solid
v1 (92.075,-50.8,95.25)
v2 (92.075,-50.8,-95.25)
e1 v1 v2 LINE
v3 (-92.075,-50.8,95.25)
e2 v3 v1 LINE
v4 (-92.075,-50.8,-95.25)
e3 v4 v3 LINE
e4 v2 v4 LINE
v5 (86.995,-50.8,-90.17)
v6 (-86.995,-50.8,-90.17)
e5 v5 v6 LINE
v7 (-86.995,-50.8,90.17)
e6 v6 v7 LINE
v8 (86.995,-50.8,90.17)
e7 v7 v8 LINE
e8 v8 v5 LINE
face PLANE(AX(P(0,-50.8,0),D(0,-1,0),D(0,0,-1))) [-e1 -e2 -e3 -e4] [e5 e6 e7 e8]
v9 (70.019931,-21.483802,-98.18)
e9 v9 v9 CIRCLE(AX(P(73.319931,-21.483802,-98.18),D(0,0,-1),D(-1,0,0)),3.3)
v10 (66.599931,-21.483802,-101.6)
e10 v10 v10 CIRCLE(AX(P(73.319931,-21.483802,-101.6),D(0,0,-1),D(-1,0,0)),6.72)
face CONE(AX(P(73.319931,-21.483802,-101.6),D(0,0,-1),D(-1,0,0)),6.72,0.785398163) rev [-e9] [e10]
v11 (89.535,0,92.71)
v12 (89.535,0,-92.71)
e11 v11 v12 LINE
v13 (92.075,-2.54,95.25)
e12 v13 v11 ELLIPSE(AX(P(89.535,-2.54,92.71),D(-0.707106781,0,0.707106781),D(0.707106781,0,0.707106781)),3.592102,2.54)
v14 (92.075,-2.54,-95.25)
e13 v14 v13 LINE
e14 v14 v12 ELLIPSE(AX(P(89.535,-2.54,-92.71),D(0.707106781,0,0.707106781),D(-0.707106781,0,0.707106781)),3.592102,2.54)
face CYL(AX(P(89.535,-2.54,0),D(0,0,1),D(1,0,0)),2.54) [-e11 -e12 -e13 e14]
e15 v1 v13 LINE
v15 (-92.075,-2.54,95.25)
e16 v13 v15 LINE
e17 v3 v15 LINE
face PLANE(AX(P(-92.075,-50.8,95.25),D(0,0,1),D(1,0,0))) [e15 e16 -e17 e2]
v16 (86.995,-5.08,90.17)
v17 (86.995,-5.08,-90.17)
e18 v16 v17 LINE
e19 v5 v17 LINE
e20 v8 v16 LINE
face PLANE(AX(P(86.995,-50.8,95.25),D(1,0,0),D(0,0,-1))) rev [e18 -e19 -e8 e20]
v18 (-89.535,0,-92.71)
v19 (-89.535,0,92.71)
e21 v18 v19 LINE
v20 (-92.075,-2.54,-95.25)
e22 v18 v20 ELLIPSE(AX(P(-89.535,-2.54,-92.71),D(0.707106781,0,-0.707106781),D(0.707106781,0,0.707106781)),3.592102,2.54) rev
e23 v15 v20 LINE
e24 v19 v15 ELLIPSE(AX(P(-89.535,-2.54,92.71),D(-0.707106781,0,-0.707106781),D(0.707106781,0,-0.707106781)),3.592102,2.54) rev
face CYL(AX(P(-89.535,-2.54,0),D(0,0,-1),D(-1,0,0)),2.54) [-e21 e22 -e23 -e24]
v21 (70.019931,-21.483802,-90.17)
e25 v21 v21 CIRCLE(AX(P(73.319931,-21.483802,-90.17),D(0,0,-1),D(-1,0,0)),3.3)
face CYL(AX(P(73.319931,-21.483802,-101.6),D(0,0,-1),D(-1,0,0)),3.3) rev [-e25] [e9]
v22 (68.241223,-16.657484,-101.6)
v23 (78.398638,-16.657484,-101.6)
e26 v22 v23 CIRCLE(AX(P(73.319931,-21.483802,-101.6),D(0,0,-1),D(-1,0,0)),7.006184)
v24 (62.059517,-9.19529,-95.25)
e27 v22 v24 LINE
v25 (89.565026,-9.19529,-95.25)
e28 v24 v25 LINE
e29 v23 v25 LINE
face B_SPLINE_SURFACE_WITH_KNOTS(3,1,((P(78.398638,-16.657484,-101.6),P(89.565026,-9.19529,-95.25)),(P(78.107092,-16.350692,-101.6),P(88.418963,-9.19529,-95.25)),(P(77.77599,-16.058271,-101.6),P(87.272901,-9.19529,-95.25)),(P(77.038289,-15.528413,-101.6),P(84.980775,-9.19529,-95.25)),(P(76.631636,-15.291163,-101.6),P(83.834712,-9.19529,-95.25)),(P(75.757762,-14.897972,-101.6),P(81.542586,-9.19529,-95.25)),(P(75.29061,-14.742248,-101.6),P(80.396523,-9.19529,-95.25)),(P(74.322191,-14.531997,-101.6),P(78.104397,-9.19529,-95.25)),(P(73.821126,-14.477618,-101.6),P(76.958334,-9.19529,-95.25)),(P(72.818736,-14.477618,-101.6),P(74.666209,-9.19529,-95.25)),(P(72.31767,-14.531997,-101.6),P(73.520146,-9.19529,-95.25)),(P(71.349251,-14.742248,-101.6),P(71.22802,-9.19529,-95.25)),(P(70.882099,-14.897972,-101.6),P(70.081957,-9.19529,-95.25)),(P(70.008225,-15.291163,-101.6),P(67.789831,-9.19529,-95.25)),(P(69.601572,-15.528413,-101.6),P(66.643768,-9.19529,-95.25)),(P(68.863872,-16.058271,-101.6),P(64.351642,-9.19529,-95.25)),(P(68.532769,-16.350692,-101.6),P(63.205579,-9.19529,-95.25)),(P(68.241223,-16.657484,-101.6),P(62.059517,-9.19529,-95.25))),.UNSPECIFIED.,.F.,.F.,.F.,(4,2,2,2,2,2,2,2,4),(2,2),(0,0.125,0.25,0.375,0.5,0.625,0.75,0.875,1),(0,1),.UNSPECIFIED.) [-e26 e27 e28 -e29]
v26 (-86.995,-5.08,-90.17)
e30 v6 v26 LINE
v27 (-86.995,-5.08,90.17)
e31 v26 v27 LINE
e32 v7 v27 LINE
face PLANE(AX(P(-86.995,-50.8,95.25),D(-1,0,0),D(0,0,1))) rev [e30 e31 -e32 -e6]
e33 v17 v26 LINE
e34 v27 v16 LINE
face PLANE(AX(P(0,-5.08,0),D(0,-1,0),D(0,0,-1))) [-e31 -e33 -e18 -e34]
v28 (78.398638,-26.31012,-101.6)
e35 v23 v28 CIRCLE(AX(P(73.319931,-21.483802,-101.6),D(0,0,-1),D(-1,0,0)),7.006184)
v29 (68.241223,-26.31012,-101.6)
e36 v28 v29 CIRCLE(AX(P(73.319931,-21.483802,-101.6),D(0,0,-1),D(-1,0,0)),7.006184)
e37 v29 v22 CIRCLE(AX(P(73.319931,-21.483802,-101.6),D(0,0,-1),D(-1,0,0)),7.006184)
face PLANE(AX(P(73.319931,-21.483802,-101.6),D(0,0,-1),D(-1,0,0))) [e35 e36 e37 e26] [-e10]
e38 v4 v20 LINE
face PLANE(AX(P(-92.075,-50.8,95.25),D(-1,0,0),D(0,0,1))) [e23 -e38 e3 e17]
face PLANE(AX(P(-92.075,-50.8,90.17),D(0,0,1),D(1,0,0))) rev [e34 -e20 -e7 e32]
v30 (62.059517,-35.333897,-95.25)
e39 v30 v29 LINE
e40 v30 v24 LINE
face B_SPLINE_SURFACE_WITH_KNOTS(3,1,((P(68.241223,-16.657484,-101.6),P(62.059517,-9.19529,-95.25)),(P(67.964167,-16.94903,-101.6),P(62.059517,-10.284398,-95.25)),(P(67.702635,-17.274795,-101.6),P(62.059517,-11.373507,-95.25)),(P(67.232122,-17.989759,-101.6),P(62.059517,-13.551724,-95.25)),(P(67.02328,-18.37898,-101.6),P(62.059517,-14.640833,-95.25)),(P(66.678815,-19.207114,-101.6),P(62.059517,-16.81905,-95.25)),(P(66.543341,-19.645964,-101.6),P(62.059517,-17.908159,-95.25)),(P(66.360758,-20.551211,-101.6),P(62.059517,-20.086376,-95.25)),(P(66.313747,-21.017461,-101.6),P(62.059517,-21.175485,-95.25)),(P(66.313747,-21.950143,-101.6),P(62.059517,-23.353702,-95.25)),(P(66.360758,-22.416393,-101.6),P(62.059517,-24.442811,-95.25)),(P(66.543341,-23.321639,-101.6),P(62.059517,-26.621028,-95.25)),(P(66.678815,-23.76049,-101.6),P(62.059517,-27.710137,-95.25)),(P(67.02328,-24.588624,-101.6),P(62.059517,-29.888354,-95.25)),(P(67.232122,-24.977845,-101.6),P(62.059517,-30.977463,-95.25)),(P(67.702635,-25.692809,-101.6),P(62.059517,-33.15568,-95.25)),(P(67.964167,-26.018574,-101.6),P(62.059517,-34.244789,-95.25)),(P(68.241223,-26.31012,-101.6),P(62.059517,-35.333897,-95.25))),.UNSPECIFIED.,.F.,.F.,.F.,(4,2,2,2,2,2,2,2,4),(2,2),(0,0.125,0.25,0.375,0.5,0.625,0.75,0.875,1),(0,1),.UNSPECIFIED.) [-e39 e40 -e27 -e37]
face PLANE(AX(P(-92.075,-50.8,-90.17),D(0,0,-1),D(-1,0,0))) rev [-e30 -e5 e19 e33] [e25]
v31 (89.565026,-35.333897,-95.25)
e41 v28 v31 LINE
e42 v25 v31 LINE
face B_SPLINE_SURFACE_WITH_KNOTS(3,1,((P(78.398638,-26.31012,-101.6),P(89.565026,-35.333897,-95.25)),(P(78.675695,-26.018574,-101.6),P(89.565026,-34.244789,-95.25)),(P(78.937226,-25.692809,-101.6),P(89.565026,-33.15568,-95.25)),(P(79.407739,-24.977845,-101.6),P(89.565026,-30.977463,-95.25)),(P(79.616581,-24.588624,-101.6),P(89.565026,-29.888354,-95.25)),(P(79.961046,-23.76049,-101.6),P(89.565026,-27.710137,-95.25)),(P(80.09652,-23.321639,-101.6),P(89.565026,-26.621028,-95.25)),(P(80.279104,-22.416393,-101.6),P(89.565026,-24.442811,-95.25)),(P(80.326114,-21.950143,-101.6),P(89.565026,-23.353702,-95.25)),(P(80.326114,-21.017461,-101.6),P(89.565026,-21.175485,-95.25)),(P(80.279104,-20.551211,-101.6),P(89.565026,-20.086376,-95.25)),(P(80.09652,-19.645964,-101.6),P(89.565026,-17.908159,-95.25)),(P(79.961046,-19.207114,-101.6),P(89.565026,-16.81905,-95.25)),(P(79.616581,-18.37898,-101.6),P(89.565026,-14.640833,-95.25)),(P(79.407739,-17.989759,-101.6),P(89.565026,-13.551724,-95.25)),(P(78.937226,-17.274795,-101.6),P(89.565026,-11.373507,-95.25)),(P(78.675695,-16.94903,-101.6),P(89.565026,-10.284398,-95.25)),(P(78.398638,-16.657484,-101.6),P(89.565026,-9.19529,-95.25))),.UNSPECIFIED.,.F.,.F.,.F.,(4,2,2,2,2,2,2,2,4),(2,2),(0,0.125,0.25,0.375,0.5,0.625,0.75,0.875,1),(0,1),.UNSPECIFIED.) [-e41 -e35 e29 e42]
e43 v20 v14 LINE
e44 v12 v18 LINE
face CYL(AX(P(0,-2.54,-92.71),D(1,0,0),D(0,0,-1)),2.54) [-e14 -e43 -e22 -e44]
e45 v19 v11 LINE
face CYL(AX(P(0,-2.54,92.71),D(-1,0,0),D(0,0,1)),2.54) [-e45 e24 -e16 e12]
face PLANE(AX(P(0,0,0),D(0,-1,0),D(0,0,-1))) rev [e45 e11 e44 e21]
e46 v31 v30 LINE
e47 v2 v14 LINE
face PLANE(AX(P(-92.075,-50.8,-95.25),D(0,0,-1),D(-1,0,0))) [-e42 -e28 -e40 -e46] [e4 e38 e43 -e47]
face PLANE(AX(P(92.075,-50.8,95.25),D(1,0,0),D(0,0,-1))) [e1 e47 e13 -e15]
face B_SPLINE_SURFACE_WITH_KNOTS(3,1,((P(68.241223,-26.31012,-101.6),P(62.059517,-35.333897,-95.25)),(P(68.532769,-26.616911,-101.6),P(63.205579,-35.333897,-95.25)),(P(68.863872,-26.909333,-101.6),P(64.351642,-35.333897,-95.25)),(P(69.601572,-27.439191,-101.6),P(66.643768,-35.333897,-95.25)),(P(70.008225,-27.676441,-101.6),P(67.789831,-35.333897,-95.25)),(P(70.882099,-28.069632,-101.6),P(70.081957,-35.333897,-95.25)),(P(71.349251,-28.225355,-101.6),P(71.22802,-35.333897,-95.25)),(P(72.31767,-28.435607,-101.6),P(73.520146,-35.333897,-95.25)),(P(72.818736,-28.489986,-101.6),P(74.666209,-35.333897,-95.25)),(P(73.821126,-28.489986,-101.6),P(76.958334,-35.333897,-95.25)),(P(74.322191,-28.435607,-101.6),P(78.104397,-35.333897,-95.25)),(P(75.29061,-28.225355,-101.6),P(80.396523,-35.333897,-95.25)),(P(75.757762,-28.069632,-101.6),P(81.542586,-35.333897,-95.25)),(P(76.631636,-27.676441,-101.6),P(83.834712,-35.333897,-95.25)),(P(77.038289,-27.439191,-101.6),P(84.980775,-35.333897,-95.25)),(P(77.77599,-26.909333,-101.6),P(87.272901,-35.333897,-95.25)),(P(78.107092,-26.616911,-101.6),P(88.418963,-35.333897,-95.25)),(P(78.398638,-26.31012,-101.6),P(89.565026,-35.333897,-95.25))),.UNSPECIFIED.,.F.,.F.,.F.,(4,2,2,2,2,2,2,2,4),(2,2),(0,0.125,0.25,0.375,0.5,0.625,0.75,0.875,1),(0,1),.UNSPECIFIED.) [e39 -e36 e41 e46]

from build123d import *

# Parameters (mm, degrees)
SKETCH2_W                                            = 184.15
SKETCH2_H                                            = 190.5
BOSS_EXTRUDE1_DEPTH                                  = 50.8
SHELL1_T                                             = -5.08
CSK_FOR_M6_HEX_SOCKET_COUNTERSUNK_CAP_SC_D           = 6.6
CSK_FOR_M6_HEX_SOCKET_COUNTERSUNK_CAP_SC_DEPTH       = 11.733159957
CSK_FOR_M6_HEX_SOCKET_COUNTERSUNK_CAP_SC_CSINK_D     = 13.44
CSK_FOR_M6_HEX_SOCKET_COUNTERSUNK_CAP_SC_CSINK_ANGLE = 90
CSK_FOR_M6_HEX_SOCKET_COUNTERSUNK_CAP_SC_TIP         = 1.982840043
FILLET1_R                                            = 2.54


with BuildPart() as part:
    # Sketch2 → Boss-Extrude1 (new body)
    with BuildSketch(Plane(origin=(0, 0, 0), x_dir=(1, 0, 0), z_dir=(0, 1, 0))):
        Rectangle(SKETCH2_W, SKETCH2_H)
    extrude(amount=-BOSS_EXTRUDE1_DEPTH)

    # Shell1
    shell1_openings = [part.faces().sort_by_distance(p)[0] for p in [
        (0, -50.8, 0),
    ]]
    offset(amount=SHELL1_T, openings=shell1_openings, kind=Kind.INTERSECTION)

    # Loft1: read off the stored shape, not the designer's step
    # Loft1: loft between two sections, ruled curve by curve
    loft1_from = [
        Edge.make_bspline([(68.241223487, -26.310119776, -101.6), (68.532768976, -26.616911457, -101.6), (68.863871753, -26.909333008, -101.6), (69.601572379, -27.439191099, -101.6), (70.008225028, -27.676441112, -101.6), (70.882099248, -28.069631586, -101.6), (71.349251098, -28.225355381, -101.6), (72.31767022, -28.435607084, -101.6), (72.818735502, -28.489985667, -101.6), (73.821125836, -28.489985667, -101.6), (74.322191118, -28.435607084, -101.6), (75.29061024, -28.225355381, -101.6), (75.757762089, -28.069631586, -101.6), (76.631636309, -27.676441112, -101.6), (77.038288959, -27.439191099, -101.6), (77.775989584, -26.909333008, -101.6), (78.107092362, -26.616911457, -101.6), (78.39863785, -26.310119776, -101.6)], [0, 0, 0, 0, 0.125, 0.125, 0.25, 0.25, 0.375, 0.375, 0.5, 0.5, 0.625, 0.625, 0.75, 0.75, 0.875, 0.875, 1, 1, 1, 1], 3),
        Edge.make_bspline([(78.39863785, -26.310119776, -101.6), (78.675694815, -26.018574288, -101.6), (78.937226358, -25.692808769, -101.6), (79.407739121, -24.977845102, -101.6), (79.616581189, -24.588623733, -101.6), (79.961046476, -23.760489668, -101.6), (80.096520237, -23.321639377, -101.6), (80.279103538, -22.416392759, -101.6), (80.326114413, -21.950142771, -101.6), (80.326114413, -21.017461075, -101.6), (80.279103538, -20.551211086, -101.6), (80.096520237, -19.645964468, -101.6), (79.961046476, -19.207114178, -101.6), (79.616581189, -18.378980112, -101.6), (79.407739121, -17.989758743, -101.6), (78.937226358, -17.274795077, -101.6), (78.675694815, -16.949029558, -101.6), (78.39863785, -16.657484069, -101.6)], [0, 0, 0, 0, 0.125, 0.125, 0.25, 0.25, 0.375, 0.375, 0.5, 0.5, 0.625, 0.625, 0.75, 0.75, 0.875, 0.875, 1, 1, 1, 1], 3),
        Edge.make_bspline([(68.241223487, -16.657484069, -101.6), (67.964166523, -16.949029558, -101.6), (67.70263498, -17.274795077, -101.6), (67.232122217, -17.989758743, -101.6), (67.023280149, -18.378980112, -101.6), (66.678814862, -19.207114178, -101.6), (66.543341101, -19.645964468, -101.6), (66.3607578, -20.551211086, -101.6), (66.313746925, -21.017461075, -101.6), (66.313746925, -21.950142771, -101.6), (66.3607578, -22.416392759, -101.6), (66.543341101, -23.321639377, -101.6), (66.678814862, -23.760489668, -101.6), (67.023280149, -24.588623733, -101.6), (67.232122217, -24.977845102, -101.6), (67.70263498, -25.692808769, -101.6), (67.964166523, -26.018574288, -101.6), (68.241223487, -26.310119776, -101.6)], [0, 0, 0, 0, 0.125, 0.125, 0.25, 0.25, 0.375, 0.375, 0.5, 0.5, 0.625, 0.625, 0.75, 0.75, 0.875, 0.875, 1, 1, 1, 1], 3),
        Edge.make_bspline([(78.39863785, -16.657484069, -101.6), (78.107092362, -16.350692388, -101.6), (77.775989584, -16.058270838, -101.6), (77.038288959, -15.528412746, -101.6), (76.631636309, -15.291162733, -101.6), (75.757762089, -14.89797226, -101.6), (75.29061024, -14.742248464, -101.6), (74.322191118, -14.531996762, -101.6), (73.821125836, -14.477618178, -101.6), (72.818735502, -14.477618178, -101.6), (72.31767022, -14.531996762, -101.6), (71.349251098, -14.742248464, -101.6), (70.882099248, -14.89797226, -101.6), (70.008225028, -15.291162733, -101.6), (69.601572379, -15.528412746, -101.6), (68.863871753, -16.058270838, -101.6), (68.532768976, -16.350692388, -101.6), (68.241223487, -16.657484069, -101.6)], [0, 0, 0, 0, 0.125, 0.125, 0.25, 0.25, 0.375, 0.375, 0.5, 0.5, 0.625, 0.625, 0.75, 0.75, 0.875, 0.875, 1, 1, 1, 1], 3),
    ]
    loft1_to = [
        Edge.make_bspline([(62.059516528, -35.333897225, -95.25), (63.205579438, -35.333897225, -95.25), (64.351642348, -35.333897225, -95.25), (66.643768167, -35.333897225, -95.25), (67.789831077, -35.333897225, -95.25), (70.081956897, -35.333897225, -95.25), (71.228019807, -35.333897225, -95.25), (73.520145626, -35.333897225, -95.25), (74.666208536, -35.333897225, -95.25), (76.958334356, -35.333897225, -95.25), (78.104397266, -35.333897225, -95.25), (80.396523085, -35.333897225, -95.25), (81.542585995, -35.333897225, -95.25), (83.834711815, -35.333897225, -95.25), (84.980774725, -35.333897225, -95.25), (87.272900544, -35.333897225, -95.25), (88.418963454, -35.333897225, -95.25), (89.565026364, -35.333897225, -95.25)], [0, 0, 0, 0, 0.125, 0.125, 0.25, 0.25, 0.375, 0.375, 0.5, 0.5, 0.625, 0.625, 0.75, 0.75, 0.875, 0.875, 1, 1, 1, 1], 3),
        Edge.make_bspline([(89.565026364, -35.333897225, -95.25), (89.565026364, -34.244788582, -95.25), (89.565026364, -33.15567994, -95.25), (89.565026364, -30.977462655, -95.25), (89.565026364, -29.888354013, -95.25), (89.565026364, -27.710136729, -95.25), (89.565026364, -26.621028086, -95.25), (89.565026364, -24.442810802, -95.25), (89.565026364, -23.353702159, -95.25), (89.565026364, -21.175484875, -95.25), (89.565026364, -20.086376233, -95.25), (89.565026364, -17.908158948, -95.25), (89.565026364, -16.819050306, -95.25), (89.565026364, -14.640833021, -95.25), (89.565026364, -13.551724379, -95.25), (89.565026364, -11.373507094, -95.25), (89.565026364, -10.284398452, -95.25), (89.565026364, -9.19528981, -95.25)], [0, 0, 0, 0, 0.125, 0.125, 0.25, 0.25, 0.375, 0.375, 0.5, 0.5, 0.625, 0.625, 0.75, 0.75, 0.875, 0.875, 1, 1, 1, 1], 3),
        Edge.make_bspline([(62.059516528, -9.19528981, -95.25), (62.059516528, -10.284398452, -95.25), (62.059516528, -11.373507094, -95.25), (62.059516528, -13.551724379, -95.25), (62.059516528, -14.640833021, -95.25), (62.059516528, -16.819050306, -95.25), (62.059516528, -17.908158948, -95.25), (62.059516528, -20.086376233, -95.25), (62.059516528, -21.175484875, -95.25), (62.059516528, -23.353702159, -95.25), (62.059516528, -24.442810802, -95.25), (62.059516528, -26.621028086, -95.25), (62.059516528, -27.710136729, -95.25), (62.059516528, -29.888354013, -95.25), (62.059516528, -30.977462655, -95.25), (62.059516528, -33.15567994, -95.25), (62.059516528, -34.244788582, -95.25), (62.059516528, -35.333897225, -95.25)], [0, 0, 0, 0, 0.125, 0.125, 0.25, 0.25, 0.375, 0.375, 0.5, 0.5, 0.625, 0.625, 0.75, 0.75, 0.875, 0.875, 1, 1, 1, 1], 3),
        Edge.make_bspline([(89.565026364, -9.19528981, -95.25), (88.418963454, -9.19528981, -95.25), (87.272900544, -9.19528981, -95.25), (84.980774725, -9.19528981, -95.25), (83.834711815, -9.19528981, -95.25), (81.542585995, -9.19528981, -95.25), (80.396523085, -9.19528981, -95.25), (78.104397266, -9.19528981, -95.25), (76.958334356, -9.19528981, -95.25), (74.666208536, -9.19528981, -95.25), (73.520145626, -9.19528981, -95.25), (71.228019807, -9.19528981, -95.25), (70.081956897, -9.19528981, -95.25), (67.789831077, -9.19528981, -95.25), (66.643768167, -9.19528981, -95.25), (64.351642348, -9.19528981, -95.25), (63.205579438, -9.19528981, -95.25), (62.059516528, -9.19528981, -95.25)], [0, 0, 0, 0, 0.125, 0.125, 0.25, 0.25, 0.375, 0.375, 0.5, 0.5, 0.625, 0.625, 0.75, 0.75, 0.875, 0.875, 1, 1, 1, 1], 3),
    ]
    loft1 = Solid(Shell([*[Face.make_surface_from_curves(loft1_from[k], loft1_to[k]) for k in range(4)], Face(Wire(loft1_from)), Face(Wire(loft1_to))]))
    add(loft1)

    # CSK for M6 Hex Socket Countersunk Cap Screw1
    with Locations(Plane(origin=(0, 0, -101.6), x_dir=(-1, 0, 0), z_dir=(0, 0, -1))):
        with Locations((-73.319930669, -21.483801923)):
            CounterSinkHole(CSK_FOR_M6_HEX_SOCKET_COUNTERSUNK_CAP_SC_D / 2, CSK_FOR_M6_HEX_SOCKET_COUNTERSUNK_CAP_SC_CSINK_D / 2, depth=CSK_FOR_M6_HEX_SOCKET_COUNTERSUNK_CAP_SC_DEPTH, counter_sink_angle=CSK_FOR_M6_HEX_SOCKET_COUNTERSUNK_CAP_SC_CSINK_ANGLE)
            with Locations((0, 0, -(CSK_FOR_M6_HEX_SOCKET_COUNTERSUNK_CAP_SC_DEPTH + CSK_FOR_M6_HEX_SOCKET_COUNTERSUNK_CAP_SC_TIP / 2))):  # 118° drill point
                Cone(0, CSK_FOR_M6_HEX_SOCKET_COUNTERSUNK_CAP_SC_D / 2, CSK_FOR_M6_HEX_SOCKET_COUNTERSUNK_CAP_SC_TIP, mode=Mode.SUBTRACT)

    # Fillet1
    fillet1_edges = [part.edges().sort_by_distance(p)[0] for p in [
        (0, 0, 95.25),
        (-92.075, 0, 0),
        (0, 0, -95.25),
        (92.075, 0, 0),
    ]]
    fillet(fillet1_edges, radius=FILLET1_R)


solid = part.part
